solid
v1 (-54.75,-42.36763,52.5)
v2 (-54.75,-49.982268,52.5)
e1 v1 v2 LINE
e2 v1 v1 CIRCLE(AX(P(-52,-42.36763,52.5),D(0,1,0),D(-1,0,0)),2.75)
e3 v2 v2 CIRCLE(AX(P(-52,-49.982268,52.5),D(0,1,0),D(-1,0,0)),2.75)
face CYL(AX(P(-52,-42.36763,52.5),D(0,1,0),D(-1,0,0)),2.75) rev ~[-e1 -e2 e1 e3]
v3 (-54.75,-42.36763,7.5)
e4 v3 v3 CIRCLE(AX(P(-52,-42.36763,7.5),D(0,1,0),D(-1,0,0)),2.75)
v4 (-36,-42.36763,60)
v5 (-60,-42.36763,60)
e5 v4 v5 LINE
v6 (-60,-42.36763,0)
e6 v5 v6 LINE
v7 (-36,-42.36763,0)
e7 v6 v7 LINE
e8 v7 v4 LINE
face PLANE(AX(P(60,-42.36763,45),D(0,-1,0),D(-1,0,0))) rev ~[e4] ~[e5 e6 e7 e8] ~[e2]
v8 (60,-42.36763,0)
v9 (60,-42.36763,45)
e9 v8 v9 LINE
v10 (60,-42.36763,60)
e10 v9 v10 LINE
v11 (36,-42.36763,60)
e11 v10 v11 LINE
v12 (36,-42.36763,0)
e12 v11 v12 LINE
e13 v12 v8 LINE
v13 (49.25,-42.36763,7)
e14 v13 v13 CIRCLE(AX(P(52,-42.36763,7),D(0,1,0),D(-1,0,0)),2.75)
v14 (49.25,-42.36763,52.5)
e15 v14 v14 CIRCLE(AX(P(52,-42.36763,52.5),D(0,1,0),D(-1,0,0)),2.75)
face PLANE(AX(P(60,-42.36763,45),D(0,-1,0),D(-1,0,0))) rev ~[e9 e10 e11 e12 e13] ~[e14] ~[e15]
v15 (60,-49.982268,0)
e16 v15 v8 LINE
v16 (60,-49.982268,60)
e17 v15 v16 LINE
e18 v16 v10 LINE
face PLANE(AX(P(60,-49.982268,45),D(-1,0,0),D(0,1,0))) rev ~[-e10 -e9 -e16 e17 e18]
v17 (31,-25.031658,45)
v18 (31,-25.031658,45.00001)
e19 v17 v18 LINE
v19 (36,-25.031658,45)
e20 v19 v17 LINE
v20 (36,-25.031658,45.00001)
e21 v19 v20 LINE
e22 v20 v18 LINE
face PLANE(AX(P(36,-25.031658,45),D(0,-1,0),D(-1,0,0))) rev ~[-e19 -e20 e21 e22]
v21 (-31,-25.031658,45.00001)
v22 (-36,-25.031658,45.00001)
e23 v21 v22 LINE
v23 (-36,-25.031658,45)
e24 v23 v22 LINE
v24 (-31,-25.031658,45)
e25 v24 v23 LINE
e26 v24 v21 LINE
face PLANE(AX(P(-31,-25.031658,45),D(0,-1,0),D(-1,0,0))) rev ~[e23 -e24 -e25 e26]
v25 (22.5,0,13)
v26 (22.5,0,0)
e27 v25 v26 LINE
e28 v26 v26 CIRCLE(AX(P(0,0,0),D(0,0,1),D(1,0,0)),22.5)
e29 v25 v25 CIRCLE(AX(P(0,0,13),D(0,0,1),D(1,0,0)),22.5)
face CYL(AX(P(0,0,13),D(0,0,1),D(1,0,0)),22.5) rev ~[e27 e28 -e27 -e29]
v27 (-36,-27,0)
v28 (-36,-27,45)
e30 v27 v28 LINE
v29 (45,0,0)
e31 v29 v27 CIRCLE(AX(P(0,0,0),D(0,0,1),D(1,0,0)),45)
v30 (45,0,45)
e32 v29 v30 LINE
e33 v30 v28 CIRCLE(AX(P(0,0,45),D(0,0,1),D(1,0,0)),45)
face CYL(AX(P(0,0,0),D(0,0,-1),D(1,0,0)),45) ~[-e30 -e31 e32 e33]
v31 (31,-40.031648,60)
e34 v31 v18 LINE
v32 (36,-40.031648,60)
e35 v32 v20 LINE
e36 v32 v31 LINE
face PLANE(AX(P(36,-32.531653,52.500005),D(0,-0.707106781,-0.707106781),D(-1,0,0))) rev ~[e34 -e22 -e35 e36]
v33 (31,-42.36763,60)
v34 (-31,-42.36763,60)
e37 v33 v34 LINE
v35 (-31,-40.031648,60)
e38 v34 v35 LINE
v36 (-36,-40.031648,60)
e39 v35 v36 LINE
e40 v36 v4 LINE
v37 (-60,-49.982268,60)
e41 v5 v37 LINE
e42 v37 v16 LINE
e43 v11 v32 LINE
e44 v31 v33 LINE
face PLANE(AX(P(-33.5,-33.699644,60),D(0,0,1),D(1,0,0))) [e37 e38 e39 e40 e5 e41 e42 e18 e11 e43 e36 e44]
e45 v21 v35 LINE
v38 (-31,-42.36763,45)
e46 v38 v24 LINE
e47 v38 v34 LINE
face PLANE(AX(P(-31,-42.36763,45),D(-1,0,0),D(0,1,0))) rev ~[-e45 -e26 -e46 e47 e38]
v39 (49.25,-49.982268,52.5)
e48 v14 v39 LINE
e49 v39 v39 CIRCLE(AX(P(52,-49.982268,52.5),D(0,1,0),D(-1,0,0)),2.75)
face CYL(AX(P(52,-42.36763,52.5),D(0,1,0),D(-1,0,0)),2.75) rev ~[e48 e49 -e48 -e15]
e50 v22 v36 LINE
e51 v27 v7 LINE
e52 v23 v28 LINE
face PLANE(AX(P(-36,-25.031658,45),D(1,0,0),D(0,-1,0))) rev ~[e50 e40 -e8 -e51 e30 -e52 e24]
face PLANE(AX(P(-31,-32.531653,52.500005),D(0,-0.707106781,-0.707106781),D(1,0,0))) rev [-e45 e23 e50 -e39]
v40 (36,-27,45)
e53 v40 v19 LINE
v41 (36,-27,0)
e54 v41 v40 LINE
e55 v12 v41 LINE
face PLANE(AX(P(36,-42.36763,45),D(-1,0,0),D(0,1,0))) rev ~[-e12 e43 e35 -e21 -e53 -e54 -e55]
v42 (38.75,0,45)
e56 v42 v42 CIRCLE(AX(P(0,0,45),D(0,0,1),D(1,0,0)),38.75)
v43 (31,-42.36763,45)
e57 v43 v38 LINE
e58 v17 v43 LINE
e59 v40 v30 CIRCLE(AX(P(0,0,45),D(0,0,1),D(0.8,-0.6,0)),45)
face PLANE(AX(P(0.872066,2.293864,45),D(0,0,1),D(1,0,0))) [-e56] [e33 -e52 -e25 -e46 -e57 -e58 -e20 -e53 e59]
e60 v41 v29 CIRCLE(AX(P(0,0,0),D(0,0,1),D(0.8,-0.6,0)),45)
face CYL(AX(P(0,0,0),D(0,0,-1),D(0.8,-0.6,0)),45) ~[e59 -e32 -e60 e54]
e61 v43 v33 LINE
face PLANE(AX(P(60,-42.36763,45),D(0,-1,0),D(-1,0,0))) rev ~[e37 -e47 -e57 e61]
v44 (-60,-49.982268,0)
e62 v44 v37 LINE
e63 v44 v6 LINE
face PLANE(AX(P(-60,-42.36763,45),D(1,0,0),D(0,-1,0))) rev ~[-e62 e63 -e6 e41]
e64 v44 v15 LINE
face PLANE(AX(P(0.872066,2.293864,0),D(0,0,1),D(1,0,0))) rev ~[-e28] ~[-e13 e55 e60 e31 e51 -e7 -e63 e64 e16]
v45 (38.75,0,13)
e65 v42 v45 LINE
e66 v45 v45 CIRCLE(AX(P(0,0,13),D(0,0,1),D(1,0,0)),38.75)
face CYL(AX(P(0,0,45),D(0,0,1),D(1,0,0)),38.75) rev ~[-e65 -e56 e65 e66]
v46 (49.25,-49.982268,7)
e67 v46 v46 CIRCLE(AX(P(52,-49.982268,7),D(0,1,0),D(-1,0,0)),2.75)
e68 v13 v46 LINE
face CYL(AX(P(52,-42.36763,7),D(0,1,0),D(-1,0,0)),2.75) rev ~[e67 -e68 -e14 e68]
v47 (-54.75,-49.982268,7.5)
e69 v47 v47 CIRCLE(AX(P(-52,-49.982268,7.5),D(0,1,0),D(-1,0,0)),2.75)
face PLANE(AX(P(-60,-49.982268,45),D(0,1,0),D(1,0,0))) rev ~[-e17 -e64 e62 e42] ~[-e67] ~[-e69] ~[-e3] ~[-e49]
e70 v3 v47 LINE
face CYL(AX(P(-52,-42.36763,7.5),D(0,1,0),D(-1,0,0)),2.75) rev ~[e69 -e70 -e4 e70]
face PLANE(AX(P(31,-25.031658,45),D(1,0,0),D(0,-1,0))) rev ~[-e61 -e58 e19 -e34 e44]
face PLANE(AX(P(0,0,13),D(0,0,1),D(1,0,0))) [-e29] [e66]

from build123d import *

# Parameters (mm, degrees)
F0_W      = 24
F0_H      = 7.6146386564
F1_DEPTH  = 45
F2_R      = 38.75
F4_DEPTH  = 32
F5_DEPTH  = 15
F7_DEPTH  = 15
F8_SIZE   = 14.99999
F9_R      = 2.75
F10_DEPTH = 25
F11_R     = 22.5
F12_DEPTH = 25


# Not quite as in the source:
# - a fillet or chamfer is up to 0.001 mm smaller than in the source, because OpenCascade refuses the exact size


with BuildPart() as f1:
    # F0 (on Top) → F1 (new body)
    with BuildSketch(Plane.XY):
        with BuildLine():
            ThreePointArc((36, -27), (42.6907484123, -14.2302494708), (45, 0))
            ThreePointArc((45, 0), (-14.2302494708, 42.6907484123), (-36, -27))
            Line((-36, -27), (36, -27))
        make_face()
        with BuildLine():
            ThreePointArc((-15.1652218257, -42.3676297069), (-26.7116265289, -36.2144861648), (-36, -27))
            Line((-36, -27), (-36, -42.3676297069))
            Line((-36, -42.3676297069), (-15.1652218257, -42.3676297069))
        make_face()
        with BuildLine():
            Line((36, -27), (-36, -27))
            ThreePointArc((-36, -27), (-26.7116265289, -36.2144861648), (-15.1652218257, -42.3676297069))
            Line((-15.1652218257, -42.3676297069), (15.1652218257, -42.3676297069))
            ThreePointArc((15.1652218257, -42.3676297069), (26.7116265289, -36.2144861648), (36, -27))
        make_face()
        with BuildLine():
            Line((15.1652218257, -42.3676297069), (-15.1652218257, -42.3676297069))
            ThreePointArc((-15.1652218257, -42.3676297069), (0, -45), (15.1652218257, -42.3676297069))
        make_face()
        with Locations((-48, -46.174949035)):
            Rectangle(F0_W, F0_H)
        with BuildLine():
            ThreePointArc((15.1652218257, -42.3676297069), (0, -45), (-15.1652218257, -42.3676297069))
            Line((-15.1652218257, -42.3676297069), (-36, -42.3676297069))
            Line((-36, -42.3676297069), (-36, -49.9822683632))
            Line((-36, -49.9822683632), (36, -49.9822683632))
            Line((36, -49.9822683632), (36, -42.3676297069))
            Line((36, -42.3676297069), (15.1652218257, -42.3676297069))
        make_face()
        with Locations((48, -46.174949035)):
            Rectangle(F0_W, F0_H)
        with BuildLine():
            Line((36, -42.3676297069), (36, -27))
            ThreePointArc((36, -27), (26.7116265289, -36.2144861648), (15.1652218257, -42.3676297069))
            Line((15.1652218257, -42.3676297069), (36, -42.3676297069))
        make_face()
    extrude(amount=F1_DEPTH)

    # F2 (on face) → F4 (cut)
    with BuildSketch(Plane.XY.offset(45)):
        Circle(F2_R)
    extrude(amount=-F4_DEPTH, mode=Mode.SUBTRACT)

    # F3 (on face) → F5 (join)
    with BuildSketch(Plane.XY.offset(45)):
        Polygon((-36, -42.3676297069), (-60, -42.3676297069), (-60, -49.9822683632), (60, -49.9822683632), (60, -42.3676297069), (36, -42.3676297069), align=None)
    extrude(amount=F5_DEPTH)

    # F6 (on face) → F7 (join)
    with BuildSketch(Plane.XY.offset(45)):
        Polygon((-31, -25.031657964), (-36, -25.031657964), (-36, -27), (-36, -42.3676297069), (-31, -42.3676297069), align=None)
        Polygon((36, -42.3676297069), (36, -27), (36, -25.031657964), (31, -25.031657964), (31, -42.3676297069), align=None)
    extrude(amount=F7_DEPTH)

    # F8 (size 15 in the source; OpenCascade refuses exactly that, so slightly less here)
    f8_edges = [f1.edges().sort_by_distance(p)[0] for p in [
        (-33.5, -25.031658, 60),
        (33.5, -25.031658, 60),
    ]]
    chamfer(f8_edges, length=F8_SIZE)

    # F9 (on face) → F10 (cut)
    with BuildSketch(Plane(origin=(0, -42.3676297069, 0), x_dir=(-1, 0, 0), z_dir=(0, 1, 0))):
        with Locations((52, 7.5)):
            Circle(F9_R)
        with Locations((52, 52.5)):
            Circle(F9_R)
        with Locations((-52, 7)):
            Circle(F9_R)
        with Locations((-52, 52.5)):
            Circle(F9_R)
    extrude(amount=-F10_DEPTH, mode=Mode.SUBTRACT)

    # F11 (on face) → F12 (cut)
    with BuildSketch(Plane.XY.offset(13)):
        Circle(F11_R)
    extrude(amount=-F12_DEPTH, mode=Mode.SUBTRACT)


solid = f1.part
